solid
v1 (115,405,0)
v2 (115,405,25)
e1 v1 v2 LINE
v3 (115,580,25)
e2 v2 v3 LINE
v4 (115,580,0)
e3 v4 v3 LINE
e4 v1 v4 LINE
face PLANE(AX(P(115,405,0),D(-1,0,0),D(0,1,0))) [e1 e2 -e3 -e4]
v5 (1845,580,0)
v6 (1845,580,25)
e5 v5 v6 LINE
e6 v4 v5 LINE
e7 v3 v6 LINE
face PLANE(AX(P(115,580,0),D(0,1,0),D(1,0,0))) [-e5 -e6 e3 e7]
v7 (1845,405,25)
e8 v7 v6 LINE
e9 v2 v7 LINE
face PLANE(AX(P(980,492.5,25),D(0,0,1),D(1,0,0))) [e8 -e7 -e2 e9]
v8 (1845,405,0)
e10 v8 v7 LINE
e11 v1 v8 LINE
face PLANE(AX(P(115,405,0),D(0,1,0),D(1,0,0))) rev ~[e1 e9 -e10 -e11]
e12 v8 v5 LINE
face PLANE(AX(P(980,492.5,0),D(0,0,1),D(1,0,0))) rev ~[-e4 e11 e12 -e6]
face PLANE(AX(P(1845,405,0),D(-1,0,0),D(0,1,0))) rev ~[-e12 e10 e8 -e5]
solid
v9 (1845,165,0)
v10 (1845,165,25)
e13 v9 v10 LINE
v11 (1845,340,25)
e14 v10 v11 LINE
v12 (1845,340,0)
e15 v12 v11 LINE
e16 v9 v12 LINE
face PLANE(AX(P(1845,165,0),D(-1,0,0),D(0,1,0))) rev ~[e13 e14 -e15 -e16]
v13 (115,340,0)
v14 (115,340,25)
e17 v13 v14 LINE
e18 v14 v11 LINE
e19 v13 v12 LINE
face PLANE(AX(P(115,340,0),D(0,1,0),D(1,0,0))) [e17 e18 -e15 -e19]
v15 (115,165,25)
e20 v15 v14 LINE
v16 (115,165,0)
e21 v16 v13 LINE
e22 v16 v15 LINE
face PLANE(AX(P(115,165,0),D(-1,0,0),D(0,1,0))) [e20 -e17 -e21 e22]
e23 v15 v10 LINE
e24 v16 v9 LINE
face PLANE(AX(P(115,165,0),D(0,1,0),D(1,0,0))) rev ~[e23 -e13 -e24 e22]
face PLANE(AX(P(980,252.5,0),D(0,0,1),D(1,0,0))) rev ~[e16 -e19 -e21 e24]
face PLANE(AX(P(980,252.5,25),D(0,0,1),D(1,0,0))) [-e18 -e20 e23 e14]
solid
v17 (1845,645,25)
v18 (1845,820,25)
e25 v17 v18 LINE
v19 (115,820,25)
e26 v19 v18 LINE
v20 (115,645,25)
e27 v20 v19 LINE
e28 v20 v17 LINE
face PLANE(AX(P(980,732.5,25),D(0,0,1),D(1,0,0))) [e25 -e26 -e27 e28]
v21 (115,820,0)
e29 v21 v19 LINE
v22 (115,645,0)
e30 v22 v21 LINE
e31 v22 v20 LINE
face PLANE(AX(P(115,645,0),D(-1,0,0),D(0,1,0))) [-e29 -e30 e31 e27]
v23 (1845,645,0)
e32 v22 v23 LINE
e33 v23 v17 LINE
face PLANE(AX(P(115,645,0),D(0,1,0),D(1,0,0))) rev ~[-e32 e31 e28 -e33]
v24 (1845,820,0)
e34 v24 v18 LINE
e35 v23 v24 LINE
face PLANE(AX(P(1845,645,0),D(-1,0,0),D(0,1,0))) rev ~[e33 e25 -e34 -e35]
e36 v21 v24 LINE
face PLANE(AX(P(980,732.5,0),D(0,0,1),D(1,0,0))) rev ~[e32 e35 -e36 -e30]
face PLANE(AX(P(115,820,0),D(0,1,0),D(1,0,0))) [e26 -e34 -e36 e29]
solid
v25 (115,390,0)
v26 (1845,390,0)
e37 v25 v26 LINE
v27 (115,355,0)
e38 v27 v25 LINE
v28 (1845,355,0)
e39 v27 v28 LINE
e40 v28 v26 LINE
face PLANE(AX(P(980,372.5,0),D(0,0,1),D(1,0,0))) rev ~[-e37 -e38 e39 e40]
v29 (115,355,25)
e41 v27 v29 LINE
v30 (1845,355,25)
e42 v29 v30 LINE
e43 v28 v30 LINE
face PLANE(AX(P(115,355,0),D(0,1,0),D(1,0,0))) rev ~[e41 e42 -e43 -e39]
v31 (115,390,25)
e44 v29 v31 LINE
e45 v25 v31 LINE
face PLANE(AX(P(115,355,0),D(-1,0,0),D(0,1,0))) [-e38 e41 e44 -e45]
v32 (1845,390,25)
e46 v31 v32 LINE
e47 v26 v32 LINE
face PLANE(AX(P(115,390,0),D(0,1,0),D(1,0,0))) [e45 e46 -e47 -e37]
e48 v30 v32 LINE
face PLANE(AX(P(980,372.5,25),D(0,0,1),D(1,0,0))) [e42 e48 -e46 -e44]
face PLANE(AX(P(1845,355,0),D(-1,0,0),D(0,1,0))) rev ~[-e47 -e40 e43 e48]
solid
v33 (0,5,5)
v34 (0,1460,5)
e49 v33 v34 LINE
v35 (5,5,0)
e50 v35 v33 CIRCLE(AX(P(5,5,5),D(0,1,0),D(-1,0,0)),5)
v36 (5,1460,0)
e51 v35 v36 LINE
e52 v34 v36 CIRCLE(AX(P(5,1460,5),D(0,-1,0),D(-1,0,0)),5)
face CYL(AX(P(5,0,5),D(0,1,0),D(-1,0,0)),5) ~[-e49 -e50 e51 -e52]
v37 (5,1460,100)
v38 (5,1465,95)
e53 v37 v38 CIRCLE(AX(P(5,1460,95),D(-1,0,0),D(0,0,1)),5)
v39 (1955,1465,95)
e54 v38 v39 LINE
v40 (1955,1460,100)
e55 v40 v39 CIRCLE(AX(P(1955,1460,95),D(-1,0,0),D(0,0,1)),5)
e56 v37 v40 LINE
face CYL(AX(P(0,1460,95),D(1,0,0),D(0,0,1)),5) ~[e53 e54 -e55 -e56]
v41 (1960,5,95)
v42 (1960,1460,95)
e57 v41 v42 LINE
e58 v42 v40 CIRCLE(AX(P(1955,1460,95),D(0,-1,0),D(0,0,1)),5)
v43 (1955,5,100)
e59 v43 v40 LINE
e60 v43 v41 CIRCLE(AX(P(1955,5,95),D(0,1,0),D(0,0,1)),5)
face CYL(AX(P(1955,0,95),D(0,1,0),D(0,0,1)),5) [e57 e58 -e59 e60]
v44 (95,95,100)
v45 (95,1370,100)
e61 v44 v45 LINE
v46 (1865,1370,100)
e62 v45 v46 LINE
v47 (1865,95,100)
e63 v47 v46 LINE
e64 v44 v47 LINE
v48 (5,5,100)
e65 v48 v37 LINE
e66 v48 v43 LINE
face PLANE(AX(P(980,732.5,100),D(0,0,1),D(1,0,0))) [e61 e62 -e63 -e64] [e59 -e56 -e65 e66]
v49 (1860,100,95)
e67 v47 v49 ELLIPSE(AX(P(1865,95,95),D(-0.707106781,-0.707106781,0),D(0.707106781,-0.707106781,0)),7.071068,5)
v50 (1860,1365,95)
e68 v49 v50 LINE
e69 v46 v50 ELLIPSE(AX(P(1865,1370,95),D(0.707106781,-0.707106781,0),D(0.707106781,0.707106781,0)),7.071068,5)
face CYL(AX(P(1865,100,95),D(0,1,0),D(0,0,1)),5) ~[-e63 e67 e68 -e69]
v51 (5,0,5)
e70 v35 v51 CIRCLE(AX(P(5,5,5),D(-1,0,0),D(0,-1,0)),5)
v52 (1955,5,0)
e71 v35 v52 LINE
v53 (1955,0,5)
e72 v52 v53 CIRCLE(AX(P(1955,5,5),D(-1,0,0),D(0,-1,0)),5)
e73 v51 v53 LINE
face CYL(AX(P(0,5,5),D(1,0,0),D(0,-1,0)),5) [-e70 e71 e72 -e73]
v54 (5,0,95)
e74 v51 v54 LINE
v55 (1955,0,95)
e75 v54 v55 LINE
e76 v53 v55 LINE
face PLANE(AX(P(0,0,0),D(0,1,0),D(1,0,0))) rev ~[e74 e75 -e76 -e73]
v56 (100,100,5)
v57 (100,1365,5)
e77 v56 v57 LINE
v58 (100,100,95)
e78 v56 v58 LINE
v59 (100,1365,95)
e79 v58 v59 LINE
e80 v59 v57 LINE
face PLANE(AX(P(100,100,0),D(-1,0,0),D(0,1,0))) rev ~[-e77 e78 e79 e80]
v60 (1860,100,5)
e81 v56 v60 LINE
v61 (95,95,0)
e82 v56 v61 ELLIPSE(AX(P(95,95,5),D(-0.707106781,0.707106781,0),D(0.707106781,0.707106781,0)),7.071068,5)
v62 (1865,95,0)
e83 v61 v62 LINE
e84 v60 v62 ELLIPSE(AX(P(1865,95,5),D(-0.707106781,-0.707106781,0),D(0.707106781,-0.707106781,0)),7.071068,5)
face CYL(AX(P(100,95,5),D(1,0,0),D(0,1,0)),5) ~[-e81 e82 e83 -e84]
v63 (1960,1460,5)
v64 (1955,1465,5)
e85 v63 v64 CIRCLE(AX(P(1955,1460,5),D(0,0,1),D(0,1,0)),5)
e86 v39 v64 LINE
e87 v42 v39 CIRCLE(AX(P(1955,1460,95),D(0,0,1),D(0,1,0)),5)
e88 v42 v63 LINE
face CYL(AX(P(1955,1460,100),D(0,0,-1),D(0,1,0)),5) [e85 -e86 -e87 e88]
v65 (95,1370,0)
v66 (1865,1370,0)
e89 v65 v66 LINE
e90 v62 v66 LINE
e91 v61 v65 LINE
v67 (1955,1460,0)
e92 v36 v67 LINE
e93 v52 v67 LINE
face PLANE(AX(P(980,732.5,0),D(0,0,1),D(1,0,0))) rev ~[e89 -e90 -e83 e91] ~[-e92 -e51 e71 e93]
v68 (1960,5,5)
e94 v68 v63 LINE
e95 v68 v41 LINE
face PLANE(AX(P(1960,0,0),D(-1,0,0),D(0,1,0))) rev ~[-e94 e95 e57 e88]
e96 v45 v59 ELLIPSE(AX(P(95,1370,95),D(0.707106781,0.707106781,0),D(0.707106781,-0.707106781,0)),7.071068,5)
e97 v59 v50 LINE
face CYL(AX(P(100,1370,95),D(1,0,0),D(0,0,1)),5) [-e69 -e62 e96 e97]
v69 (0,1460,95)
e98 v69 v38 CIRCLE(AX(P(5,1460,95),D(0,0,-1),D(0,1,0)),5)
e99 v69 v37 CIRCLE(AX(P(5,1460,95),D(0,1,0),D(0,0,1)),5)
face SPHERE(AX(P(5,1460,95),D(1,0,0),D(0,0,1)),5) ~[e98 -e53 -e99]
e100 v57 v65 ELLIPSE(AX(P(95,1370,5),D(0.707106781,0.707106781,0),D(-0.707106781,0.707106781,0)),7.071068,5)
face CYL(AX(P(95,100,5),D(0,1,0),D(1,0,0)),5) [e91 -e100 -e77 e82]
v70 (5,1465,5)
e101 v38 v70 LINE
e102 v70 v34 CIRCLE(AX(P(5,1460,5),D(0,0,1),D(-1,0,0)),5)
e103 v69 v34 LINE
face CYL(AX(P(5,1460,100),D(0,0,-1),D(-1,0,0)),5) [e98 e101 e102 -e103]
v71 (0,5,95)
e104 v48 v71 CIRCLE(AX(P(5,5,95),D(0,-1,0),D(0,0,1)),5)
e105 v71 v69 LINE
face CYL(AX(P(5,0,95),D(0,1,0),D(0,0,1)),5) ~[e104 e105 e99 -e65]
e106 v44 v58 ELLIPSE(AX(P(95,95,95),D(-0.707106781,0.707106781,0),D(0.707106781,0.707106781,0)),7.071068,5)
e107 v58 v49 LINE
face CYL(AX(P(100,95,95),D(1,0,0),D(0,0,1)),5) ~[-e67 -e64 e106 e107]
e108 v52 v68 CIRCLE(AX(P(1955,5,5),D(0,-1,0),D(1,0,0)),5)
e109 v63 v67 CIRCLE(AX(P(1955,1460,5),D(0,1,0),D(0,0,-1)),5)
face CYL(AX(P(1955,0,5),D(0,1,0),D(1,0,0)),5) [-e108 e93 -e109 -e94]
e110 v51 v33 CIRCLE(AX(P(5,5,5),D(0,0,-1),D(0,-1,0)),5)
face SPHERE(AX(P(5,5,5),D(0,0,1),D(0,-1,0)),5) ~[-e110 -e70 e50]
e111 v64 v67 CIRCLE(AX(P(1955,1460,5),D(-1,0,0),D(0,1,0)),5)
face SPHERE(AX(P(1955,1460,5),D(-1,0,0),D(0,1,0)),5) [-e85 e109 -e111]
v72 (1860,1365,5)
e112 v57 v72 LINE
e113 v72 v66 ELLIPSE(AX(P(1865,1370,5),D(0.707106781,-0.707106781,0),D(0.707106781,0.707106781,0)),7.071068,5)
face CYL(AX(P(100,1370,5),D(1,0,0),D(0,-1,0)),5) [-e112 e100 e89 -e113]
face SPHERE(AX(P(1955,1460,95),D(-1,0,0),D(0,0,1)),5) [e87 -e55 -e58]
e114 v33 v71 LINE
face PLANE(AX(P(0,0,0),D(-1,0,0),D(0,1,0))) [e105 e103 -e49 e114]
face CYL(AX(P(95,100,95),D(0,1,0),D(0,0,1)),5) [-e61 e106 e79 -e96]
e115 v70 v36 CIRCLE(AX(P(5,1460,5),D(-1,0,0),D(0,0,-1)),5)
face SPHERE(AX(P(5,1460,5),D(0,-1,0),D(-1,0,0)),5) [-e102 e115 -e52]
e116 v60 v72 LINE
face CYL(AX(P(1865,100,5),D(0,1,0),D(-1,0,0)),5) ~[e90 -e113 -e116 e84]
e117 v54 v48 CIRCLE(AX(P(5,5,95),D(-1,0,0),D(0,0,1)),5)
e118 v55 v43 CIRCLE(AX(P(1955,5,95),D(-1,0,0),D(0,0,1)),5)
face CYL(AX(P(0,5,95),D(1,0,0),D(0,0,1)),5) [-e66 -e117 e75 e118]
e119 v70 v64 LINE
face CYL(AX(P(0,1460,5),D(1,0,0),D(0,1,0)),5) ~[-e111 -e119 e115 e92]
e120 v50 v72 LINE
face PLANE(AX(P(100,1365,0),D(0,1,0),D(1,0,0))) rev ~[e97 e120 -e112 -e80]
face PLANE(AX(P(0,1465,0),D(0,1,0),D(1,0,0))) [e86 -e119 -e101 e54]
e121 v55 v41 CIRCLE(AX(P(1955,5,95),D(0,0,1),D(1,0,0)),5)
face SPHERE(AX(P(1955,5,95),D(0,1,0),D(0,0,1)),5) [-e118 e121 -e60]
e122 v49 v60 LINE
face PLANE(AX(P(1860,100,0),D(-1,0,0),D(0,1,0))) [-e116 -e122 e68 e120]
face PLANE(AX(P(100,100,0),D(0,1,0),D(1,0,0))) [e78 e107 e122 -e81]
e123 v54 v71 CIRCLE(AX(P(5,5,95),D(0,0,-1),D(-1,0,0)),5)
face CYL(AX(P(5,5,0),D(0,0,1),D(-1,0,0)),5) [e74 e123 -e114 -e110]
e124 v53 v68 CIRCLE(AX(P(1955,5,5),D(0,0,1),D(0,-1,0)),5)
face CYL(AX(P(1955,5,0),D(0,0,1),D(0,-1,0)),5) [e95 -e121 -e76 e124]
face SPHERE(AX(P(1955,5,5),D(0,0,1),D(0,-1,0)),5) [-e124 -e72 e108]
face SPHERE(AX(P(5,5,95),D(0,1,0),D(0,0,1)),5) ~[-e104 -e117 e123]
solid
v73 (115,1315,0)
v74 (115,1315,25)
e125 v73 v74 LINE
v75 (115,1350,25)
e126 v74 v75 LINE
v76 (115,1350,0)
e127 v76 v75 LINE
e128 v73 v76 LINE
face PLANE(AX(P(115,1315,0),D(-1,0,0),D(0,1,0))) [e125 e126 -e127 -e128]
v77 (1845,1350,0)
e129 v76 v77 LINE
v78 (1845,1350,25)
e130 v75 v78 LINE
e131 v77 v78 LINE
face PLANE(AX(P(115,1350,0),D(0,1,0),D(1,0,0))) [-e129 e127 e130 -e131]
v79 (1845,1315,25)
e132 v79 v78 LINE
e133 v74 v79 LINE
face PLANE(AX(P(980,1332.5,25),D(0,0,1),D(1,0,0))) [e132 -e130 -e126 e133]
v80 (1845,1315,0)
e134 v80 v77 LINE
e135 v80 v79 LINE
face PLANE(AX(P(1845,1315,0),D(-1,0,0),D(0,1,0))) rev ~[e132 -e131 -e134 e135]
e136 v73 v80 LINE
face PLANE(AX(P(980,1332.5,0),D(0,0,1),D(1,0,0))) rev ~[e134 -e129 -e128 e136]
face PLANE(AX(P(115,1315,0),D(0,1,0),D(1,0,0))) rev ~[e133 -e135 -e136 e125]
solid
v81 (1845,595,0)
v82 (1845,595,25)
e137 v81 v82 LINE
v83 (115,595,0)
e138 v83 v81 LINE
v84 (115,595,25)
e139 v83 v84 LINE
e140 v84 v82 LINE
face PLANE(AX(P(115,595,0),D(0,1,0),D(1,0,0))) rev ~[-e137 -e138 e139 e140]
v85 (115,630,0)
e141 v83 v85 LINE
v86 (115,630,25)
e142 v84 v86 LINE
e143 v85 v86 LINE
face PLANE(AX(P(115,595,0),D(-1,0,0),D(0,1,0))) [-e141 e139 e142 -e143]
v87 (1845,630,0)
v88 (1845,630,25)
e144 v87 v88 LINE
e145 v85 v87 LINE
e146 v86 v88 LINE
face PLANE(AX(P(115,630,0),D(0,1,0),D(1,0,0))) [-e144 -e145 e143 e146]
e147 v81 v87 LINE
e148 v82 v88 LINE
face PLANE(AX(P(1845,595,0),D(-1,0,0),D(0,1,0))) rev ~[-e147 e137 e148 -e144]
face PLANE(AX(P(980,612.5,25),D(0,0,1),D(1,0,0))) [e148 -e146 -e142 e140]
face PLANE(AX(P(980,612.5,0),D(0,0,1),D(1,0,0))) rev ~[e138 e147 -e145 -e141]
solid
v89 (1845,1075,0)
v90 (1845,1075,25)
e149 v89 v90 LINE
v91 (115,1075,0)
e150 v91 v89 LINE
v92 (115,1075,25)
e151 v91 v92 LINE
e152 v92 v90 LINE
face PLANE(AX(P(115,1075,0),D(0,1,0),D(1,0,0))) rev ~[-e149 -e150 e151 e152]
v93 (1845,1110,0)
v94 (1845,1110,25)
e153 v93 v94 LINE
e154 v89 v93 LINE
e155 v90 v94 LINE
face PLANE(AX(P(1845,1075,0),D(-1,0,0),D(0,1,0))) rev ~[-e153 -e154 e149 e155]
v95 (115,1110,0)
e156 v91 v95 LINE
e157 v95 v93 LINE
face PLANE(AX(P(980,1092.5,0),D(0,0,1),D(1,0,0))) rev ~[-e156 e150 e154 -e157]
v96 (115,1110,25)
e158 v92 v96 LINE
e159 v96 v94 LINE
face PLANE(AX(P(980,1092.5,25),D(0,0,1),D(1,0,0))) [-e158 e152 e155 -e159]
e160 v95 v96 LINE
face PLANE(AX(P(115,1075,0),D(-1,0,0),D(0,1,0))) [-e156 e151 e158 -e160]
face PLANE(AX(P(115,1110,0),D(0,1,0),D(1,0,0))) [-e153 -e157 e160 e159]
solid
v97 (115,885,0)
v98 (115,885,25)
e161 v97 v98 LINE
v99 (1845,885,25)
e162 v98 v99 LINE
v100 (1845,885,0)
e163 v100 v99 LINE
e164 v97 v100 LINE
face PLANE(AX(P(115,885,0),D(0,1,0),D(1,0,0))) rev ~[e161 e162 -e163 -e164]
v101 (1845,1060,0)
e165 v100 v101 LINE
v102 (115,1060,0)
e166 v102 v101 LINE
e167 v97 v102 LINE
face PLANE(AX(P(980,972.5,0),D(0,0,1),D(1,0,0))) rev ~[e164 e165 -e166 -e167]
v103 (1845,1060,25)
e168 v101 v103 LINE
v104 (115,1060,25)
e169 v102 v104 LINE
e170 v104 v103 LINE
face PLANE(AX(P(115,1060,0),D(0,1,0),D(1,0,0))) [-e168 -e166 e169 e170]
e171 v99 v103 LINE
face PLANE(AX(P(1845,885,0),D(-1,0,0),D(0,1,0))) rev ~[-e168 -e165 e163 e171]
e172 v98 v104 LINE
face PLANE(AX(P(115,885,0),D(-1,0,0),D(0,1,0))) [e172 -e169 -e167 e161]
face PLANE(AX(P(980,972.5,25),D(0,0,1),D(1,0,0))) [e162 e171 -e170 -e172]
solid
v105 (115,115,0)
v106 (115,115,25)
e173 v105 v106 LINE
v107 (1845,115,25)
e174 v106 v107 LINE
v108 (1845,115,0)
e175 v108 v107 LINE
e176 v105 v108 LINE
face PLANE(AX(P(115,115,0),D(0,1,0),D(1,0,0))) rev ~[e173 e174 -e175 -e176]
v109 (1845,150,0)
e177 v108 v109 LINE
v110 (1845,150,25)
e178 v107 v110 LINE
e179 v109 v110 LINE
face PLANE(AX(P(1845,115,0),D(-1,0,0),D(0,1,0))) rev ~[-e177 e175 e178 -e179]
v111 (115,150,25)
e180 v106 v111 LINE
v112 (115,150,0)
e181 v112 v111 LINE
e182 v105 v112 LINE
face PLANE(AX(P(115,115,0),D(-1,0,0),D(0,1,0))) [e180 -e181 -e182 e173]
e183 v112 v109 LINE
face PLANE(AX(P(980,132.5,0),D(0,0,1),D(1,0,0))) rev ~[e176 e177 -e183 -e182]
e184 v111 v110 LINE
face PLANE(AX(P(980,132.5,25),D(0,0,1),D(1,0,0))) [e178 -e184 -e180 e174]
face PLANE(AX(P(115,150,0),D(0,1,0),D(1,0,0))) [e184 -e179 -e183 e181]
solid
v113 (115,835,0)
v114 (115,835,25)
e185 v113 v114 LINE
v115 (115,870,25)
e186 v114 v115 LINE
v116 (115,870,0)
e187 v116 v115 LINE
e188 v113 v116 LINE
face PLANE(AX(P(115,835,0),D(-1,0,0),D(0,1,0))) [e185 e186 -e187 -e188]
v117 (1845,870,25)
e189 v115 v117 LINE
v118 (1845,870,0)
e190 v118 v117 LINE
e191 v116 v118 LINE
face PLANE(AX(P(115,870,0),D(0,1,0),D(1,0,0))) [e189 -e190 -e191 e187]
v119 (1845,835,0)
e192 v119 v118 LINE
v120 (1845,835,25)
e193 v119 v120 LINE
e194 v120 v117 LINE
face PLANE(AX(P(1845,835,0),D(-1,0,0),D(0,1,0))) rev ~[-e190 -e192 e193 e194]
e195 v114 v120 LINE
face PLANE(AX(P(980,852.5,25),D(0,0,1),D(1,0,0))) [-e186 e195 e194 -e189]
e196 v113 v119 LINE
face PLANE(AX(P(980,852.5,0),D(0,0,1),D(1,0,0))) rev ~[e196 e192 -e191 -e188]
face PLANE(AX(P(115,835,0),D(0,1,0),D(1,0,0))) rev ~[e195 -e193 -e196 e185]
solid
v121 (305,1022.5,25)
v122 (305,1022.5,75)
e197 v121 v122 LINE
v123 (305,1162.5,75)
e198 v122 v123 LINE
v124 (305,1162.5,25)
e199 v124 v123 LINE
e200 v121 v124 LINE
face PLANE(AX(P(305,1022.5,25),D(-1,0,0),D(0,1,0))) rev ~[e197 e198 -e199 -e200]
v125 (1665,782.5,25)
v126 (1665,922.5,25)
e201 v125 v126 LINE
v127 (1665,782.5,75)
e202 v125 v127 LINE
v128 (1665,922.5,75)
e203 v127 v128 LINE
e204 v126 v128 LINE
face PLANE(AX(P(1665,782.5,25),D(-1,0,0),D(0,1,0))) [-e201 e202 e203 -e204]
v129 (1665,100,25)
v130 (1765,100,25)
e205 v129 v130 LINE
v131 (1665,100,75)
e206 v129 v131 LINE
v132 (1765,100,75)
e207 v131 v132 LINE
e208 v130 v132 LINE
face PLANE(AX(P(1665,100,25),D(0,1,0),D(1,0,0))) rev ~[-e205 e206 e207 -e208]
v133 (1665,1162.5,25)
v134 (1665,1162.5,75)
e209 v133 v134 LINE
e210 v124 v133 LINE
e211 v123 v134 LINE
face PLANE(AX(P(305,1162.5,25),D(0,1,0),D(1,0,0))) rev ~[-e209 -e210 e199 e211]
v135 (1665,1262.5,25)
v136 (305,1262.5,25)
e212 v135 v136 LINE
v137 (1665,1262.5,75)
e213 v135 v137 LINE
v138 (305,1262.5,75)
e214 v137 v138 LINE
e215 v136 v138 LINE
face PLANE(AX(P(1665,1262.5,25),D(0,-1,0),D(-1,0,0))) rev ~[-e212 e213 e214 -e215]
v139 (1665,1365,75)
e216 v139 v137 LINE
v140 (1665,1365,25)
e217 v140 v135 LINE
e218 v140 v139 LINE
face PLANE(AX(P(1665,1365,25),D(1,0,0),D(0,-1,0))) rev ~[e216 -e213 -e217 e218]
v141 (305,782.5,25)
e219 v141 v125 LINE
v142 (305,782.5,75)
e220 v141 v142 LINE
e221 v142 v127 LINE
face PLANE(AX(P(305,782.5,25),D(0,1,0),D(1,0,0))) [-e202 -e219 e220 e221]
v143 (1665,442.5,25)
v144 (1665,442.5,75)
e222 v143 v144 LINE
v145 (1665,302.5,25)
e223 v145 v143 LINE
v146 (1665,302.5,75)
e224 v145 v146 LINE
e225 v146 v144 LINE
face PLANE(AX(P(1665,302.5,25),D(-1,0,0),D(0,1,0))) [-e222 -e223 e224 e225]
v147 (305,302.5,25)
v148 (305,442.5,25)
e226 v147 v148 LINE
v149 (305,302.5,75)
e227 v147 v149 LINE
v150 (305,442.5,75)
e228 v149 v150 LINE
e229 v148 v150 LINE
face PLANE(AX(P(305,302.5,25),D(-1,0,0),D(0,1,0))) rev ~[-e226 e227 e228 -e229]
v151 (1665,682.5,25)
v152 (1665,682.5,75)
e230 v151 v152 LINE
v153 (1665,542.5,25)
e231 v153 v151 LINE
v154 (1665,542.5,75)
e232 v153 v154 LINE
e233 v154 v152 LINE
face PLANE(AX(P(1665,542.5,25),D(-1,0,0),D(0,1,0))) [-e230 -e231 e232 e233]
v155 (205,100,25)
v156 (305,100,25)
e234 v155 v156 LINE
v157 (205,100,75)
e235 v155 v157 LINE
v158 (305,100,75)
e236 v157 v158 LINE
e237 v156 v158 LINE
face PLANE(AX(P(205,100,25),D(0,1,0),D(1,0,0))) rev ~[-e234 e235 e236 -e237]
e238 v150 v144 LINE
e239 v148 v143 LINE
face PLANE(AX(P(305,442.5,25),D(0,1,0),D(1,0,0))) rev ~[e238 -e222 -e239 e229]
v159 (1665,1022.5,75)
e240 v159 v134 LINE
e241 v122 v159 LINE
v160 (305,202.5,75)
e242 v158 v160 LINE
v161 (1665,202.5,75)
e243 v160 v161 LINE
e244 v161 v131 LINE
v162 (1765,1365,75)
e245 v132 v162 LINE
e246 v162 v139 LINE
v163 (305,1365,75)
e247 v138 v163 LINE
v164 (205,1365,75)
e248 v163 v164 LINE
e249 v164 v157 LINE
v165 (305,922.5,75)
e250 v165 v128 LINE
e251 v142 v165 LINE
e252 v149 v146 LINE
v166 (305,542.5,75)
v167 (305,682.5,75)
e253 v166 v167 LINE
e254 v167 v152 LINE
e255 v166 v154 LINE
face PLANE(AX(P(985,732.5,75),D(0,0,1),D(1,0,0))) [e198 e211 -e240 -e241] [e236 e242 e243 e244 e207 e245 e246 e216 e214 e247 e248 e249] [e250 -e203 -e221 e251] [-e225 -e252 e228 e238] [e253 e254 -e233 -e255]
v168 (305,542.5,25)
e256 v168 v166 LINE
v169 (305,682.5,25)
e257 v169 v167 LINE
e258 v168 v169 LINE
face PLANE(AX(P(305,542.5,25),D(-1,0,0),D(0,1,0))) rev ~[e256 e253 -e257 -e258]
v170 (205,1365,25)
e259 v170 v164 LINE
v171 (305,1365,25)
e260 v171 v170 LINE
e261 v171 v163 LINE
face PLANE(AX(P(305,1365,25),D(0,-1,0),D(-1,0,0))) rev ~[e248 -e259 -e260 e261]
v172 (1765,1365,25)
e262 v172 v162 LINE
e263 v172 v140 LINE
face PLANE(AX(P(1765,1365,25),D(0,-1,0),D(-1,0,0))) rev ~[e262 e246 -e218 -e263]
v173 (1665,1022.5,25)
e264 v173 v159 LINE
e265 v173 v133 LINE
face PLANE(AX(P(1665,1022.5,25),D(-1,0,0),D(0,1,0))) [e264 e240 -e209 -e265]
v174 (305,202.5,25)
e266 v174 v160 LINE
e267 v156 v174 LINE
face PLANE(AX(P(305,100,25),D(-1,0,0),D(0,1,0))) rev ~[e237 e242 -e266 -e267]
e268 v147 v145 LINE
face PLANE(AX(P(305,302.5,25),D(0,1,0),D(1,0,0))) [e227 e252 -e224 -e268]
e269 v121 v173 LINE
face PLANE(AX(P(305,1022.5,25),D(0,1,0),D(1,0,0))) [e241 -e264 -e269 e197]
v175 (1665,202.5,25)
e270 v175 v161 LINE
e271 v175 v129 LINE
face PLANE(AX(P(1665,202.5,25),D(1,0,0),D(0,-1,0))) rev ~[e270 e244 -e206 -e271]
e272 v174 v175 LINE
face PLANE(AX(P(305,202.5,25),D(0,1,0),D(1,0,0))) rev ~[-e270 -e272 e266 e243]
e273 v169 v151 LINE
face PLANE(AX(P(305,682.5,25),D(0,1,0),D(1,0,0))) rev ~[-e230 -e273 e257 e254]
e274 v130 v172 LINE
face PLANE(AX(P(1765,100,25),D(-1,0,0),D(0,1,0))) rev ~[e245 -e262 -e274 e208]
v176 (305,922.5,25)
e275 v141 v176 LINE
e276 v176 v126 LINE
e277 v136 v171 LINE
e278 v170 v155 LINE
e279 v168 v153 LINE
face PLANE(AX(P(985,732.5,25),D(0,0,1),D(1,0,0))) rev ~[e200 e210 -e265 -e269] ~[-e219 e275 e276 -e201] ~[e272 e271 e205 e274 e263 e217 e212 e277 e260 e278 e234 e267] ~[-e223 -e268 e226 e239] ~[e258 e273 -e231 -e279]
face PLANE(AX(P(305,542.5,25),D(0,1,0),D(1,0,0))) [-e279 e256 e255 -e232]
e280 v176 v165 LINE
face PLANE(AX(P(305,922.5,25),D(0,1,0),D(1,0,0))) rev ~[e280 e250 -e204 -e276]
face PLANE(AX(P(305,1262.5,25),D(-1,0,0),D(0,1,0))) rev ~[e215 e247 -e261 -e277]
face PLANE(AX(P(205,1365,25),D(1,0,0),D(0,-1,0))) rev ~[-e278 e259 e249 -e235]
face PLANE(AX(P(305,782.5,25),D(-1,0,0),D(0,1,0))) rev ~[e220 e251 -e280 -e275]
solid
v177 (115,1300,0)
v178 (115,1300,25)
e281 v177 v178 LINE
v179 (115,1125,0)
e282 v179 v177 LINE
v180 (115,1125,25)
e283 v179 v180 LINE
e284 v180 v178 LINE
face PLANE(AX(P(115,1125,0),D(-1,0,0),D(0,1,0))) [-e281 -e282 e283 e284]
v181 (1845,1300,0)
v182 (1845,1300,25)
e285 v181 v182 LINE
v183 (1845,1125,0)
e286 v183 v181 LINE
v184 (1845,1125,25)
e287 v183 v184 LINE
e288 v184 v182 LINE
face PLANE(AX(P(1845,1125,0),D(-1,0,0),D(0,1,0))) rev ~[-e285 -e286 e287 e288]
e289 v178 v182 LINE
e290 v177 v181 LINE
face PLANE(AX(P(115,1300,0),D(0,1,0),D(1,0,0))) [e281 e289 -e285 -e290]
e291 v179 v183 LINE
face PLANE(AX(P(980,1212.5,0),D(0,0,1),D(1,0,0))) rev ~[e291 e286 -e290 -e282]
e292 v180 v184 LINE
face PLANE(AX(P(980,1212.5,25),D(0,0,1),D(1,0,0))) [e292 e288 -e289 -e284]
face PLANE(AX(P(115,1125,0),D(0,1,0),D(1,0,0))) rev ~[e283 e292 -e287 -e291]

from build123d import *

# Parameters (mm, degrees)
F0_W     = 1960
F0_H     = 1465
F0_W_2   = 1760
F0_H_2   = 1265
F1_DEPTH = 100
F2_DEPTH = 25
F0_W_3   = 1730
F0_H_3   = 175
F0_H_4   = 35
F3_R     = 5
F4_R     = 5
F5_W     = 1360
F5_H     = 140
F6_DEPTH = 50


# Not quite as in the source:
# - a feature names something its author has since deleted; it is built from what else it names


with BuildPart() as f1:
    # F0 (on Top) → F1 (new body)
    with BuildSketch(Plane.XY):
        with Locations((980, 732.5)):
            Rectangle(F0_W, F0_H)
        with Locations((980, 732.5)):
            Rectangle(F0_W_2, F0_H_2, mode=Mode.SUBTRACT)
    extrude(amount=F1_DEPTH)

    # F0 (on Top) → F2 (join)
    with BuildSketch(Plane.XY):
        with Locations((980, 732.5)):
            Rectangle(F0_W, F0_H)
        with Locations((980, 732.5)):
            Rectangle(F0_W_2, F0_H_2, mode=Mode.SUBTRACT)
    extrude(amount=F2_DEPTH)

    # F3
    f3_edges = [f1.edges().sort_by_distance(p)[0] for p in [
        (980, 1365, 100),
        (100, 732.5, 100),
        (980, 100, 100),
        (1860, 732.5, 100),
    ]]
    fillet(f3_edges, radius=F3_R)

    # F4
    f4_edges = [f1.edges().sort_by_distance(p)[0] for p in [
        (980, 1465, 100),
        (0, 732.5, 100),
        (1960, 732.5, 100),
        (980, 0, 100),
        (1960, 0, 50),
        (0, 0, 50),
        (980, 0, 0),
        (0, 732.5, 0),
        (0, 1465, 50),
        (980, 1465, 0),
        (1960, 1465, 50),
        (1960, 732.5, 0),
        (100, 732.5, 0),
        (980, 1365, 0),
        (980, 100, 0),
        (1860, 732.5, 0),
    ]]
    fillet(f4_edges, radius=F4_R)


with BuildPart() as f2:
    # F0 (on Top) → F2, piece 2 (new body)
    with BuildSketch(Plane.XY):
        with Locations((980, 1212.5)):
            Rectangle(F0_W_3, F0_H_3)
    extrude(amount=F2_DEPTH)


with BuildPart() as f2b:
    # F0 (on Top) → F2, piece 3 (new body)
    with BuildSketch(Plane.XY):
        with Locations((980, 972.5)):
            Rectangle(F0_W_3, F0_H_3)
    extrude(amount=F2_DEPTH)


with BuildPart() as f2c:
    # F0 (on Top) → F2, piece 4 (new body)
    with BuildSketch(Plane.XY):
        with Locations((980, 732.5)):
            Rectangle(F0_W_3, F0_H_3)
    extrude(amount=F2_DEPTH)


with BuildPart() as f2d:
    # F0 (on Top) → F2, piece 5 (new body)
    with BuildSketch(Plane.XY):
        with Locations((980, 492.5)):
            Rectangle(F0_W_3, F0_H_3)
    extrude(amount=F2_DEPTH)


with BuildPart() as f2e:
    # F0 (on Top) → F2, piece 6 (new body)
    with BuildSketch(Plane.XY):
        with Locations((980, 252.5)):
            Rectangle(F0_W_3, F0_H_3)
    extrude(amount=F2_DEPTH)


with BuildPart() as f2f:
    # F0 (on Top) → F2, piece 7 (new body)
    with BuildSketch(Plane.XY):
        with Locations((980, 132.5)):
            Rectangle(F0_W_3, F0_H_4)
    extrude(amount=F2_DEPTH)


with BuildPart() as f2g:
    # F0 (on Top) → F2, piece 8 (new body)
    with BuildSketch(Plane.XY):
        with Locations((980, 372.5)):
            Rectangle(F0_W_3, F0_H_4)
    extrude(amount=F2_DEPTH)


with BuildPart() as f2h:
    # F0 (on Top) → F2, piece 9 (new body)
    with BuildSketch(Plane.XY):
        with Locations((980, 612.5)):
            Rectangle(F0_W_3, F0_H_4)
    extrude(amount=F2_DEPTH)


with BuildPart() as f2i:
    # F0 (on Top) → F2, piece 10 (new body)
    with BuildSketch(Plane.XY):
        with Locations((980, 852.5)):
            Rectangle(F0_W_3, F0_H_4)
    extrude(amount=F2_DEPTH)


with BuildPart() as f2j:
    # F0 (on Top) → F2, piece 11 (new body)
    with BuildSketch(Plane.XY):
        with Locations((980, 1092.5)):
            Rectangle(F0_W_3, F0_H_4)
    extrude(amount=F2_DEPTH)


with BuildPart() as f2k:
    # F0 (on Top) → F2, piece 12 (new body)
    with BuildSketch(Plane.XY):
        with Locations((980, 1332.5)):
            Rectangle(F0_W_3, F0_H_4)
    extrude(amount=F2_DEPTH)


with BuildPart() as f6:
    # F5 (on face) → F6 (new body)
    with BuildSketch(Plane.XY.offset(25)):
        Polygon((205, 1365), (205, 100), (305, 100), (305, 202.5), (1665, 202.5), (1665, 100), (1765, 100), (1765, 1365), (1665, 1365), (1665, 1262.5), (305, 1262.5), (305, 1365), align=None)
        with Locations((985, 372.5)):
            Rectangle(F5_W, F5_H, mode=Mode.SUBTRACT)
        with Locations((985, 612.5)):
            Rectangle(F5_W, F5_H, mode=Mode.SUBTRACT)
        with Locations((985, 852.5)):
            Rectangle(F5_W, F5_H, mode=Mode.SUBTRACT)
        with Locations((985, 1092.5)):
            Rectangle(F5_W, F5_H, mode=Mode.SUBTRACT)
    extrude(amount=F6_DEPTH)


solid = Compound([f1.part, f2.part, f2b.part, f2c.part, f2d.part, f2e.part, f2f.part, f2g.part, f2h.part, f2i.part, f2j.part, f2k.part, f6.part])
